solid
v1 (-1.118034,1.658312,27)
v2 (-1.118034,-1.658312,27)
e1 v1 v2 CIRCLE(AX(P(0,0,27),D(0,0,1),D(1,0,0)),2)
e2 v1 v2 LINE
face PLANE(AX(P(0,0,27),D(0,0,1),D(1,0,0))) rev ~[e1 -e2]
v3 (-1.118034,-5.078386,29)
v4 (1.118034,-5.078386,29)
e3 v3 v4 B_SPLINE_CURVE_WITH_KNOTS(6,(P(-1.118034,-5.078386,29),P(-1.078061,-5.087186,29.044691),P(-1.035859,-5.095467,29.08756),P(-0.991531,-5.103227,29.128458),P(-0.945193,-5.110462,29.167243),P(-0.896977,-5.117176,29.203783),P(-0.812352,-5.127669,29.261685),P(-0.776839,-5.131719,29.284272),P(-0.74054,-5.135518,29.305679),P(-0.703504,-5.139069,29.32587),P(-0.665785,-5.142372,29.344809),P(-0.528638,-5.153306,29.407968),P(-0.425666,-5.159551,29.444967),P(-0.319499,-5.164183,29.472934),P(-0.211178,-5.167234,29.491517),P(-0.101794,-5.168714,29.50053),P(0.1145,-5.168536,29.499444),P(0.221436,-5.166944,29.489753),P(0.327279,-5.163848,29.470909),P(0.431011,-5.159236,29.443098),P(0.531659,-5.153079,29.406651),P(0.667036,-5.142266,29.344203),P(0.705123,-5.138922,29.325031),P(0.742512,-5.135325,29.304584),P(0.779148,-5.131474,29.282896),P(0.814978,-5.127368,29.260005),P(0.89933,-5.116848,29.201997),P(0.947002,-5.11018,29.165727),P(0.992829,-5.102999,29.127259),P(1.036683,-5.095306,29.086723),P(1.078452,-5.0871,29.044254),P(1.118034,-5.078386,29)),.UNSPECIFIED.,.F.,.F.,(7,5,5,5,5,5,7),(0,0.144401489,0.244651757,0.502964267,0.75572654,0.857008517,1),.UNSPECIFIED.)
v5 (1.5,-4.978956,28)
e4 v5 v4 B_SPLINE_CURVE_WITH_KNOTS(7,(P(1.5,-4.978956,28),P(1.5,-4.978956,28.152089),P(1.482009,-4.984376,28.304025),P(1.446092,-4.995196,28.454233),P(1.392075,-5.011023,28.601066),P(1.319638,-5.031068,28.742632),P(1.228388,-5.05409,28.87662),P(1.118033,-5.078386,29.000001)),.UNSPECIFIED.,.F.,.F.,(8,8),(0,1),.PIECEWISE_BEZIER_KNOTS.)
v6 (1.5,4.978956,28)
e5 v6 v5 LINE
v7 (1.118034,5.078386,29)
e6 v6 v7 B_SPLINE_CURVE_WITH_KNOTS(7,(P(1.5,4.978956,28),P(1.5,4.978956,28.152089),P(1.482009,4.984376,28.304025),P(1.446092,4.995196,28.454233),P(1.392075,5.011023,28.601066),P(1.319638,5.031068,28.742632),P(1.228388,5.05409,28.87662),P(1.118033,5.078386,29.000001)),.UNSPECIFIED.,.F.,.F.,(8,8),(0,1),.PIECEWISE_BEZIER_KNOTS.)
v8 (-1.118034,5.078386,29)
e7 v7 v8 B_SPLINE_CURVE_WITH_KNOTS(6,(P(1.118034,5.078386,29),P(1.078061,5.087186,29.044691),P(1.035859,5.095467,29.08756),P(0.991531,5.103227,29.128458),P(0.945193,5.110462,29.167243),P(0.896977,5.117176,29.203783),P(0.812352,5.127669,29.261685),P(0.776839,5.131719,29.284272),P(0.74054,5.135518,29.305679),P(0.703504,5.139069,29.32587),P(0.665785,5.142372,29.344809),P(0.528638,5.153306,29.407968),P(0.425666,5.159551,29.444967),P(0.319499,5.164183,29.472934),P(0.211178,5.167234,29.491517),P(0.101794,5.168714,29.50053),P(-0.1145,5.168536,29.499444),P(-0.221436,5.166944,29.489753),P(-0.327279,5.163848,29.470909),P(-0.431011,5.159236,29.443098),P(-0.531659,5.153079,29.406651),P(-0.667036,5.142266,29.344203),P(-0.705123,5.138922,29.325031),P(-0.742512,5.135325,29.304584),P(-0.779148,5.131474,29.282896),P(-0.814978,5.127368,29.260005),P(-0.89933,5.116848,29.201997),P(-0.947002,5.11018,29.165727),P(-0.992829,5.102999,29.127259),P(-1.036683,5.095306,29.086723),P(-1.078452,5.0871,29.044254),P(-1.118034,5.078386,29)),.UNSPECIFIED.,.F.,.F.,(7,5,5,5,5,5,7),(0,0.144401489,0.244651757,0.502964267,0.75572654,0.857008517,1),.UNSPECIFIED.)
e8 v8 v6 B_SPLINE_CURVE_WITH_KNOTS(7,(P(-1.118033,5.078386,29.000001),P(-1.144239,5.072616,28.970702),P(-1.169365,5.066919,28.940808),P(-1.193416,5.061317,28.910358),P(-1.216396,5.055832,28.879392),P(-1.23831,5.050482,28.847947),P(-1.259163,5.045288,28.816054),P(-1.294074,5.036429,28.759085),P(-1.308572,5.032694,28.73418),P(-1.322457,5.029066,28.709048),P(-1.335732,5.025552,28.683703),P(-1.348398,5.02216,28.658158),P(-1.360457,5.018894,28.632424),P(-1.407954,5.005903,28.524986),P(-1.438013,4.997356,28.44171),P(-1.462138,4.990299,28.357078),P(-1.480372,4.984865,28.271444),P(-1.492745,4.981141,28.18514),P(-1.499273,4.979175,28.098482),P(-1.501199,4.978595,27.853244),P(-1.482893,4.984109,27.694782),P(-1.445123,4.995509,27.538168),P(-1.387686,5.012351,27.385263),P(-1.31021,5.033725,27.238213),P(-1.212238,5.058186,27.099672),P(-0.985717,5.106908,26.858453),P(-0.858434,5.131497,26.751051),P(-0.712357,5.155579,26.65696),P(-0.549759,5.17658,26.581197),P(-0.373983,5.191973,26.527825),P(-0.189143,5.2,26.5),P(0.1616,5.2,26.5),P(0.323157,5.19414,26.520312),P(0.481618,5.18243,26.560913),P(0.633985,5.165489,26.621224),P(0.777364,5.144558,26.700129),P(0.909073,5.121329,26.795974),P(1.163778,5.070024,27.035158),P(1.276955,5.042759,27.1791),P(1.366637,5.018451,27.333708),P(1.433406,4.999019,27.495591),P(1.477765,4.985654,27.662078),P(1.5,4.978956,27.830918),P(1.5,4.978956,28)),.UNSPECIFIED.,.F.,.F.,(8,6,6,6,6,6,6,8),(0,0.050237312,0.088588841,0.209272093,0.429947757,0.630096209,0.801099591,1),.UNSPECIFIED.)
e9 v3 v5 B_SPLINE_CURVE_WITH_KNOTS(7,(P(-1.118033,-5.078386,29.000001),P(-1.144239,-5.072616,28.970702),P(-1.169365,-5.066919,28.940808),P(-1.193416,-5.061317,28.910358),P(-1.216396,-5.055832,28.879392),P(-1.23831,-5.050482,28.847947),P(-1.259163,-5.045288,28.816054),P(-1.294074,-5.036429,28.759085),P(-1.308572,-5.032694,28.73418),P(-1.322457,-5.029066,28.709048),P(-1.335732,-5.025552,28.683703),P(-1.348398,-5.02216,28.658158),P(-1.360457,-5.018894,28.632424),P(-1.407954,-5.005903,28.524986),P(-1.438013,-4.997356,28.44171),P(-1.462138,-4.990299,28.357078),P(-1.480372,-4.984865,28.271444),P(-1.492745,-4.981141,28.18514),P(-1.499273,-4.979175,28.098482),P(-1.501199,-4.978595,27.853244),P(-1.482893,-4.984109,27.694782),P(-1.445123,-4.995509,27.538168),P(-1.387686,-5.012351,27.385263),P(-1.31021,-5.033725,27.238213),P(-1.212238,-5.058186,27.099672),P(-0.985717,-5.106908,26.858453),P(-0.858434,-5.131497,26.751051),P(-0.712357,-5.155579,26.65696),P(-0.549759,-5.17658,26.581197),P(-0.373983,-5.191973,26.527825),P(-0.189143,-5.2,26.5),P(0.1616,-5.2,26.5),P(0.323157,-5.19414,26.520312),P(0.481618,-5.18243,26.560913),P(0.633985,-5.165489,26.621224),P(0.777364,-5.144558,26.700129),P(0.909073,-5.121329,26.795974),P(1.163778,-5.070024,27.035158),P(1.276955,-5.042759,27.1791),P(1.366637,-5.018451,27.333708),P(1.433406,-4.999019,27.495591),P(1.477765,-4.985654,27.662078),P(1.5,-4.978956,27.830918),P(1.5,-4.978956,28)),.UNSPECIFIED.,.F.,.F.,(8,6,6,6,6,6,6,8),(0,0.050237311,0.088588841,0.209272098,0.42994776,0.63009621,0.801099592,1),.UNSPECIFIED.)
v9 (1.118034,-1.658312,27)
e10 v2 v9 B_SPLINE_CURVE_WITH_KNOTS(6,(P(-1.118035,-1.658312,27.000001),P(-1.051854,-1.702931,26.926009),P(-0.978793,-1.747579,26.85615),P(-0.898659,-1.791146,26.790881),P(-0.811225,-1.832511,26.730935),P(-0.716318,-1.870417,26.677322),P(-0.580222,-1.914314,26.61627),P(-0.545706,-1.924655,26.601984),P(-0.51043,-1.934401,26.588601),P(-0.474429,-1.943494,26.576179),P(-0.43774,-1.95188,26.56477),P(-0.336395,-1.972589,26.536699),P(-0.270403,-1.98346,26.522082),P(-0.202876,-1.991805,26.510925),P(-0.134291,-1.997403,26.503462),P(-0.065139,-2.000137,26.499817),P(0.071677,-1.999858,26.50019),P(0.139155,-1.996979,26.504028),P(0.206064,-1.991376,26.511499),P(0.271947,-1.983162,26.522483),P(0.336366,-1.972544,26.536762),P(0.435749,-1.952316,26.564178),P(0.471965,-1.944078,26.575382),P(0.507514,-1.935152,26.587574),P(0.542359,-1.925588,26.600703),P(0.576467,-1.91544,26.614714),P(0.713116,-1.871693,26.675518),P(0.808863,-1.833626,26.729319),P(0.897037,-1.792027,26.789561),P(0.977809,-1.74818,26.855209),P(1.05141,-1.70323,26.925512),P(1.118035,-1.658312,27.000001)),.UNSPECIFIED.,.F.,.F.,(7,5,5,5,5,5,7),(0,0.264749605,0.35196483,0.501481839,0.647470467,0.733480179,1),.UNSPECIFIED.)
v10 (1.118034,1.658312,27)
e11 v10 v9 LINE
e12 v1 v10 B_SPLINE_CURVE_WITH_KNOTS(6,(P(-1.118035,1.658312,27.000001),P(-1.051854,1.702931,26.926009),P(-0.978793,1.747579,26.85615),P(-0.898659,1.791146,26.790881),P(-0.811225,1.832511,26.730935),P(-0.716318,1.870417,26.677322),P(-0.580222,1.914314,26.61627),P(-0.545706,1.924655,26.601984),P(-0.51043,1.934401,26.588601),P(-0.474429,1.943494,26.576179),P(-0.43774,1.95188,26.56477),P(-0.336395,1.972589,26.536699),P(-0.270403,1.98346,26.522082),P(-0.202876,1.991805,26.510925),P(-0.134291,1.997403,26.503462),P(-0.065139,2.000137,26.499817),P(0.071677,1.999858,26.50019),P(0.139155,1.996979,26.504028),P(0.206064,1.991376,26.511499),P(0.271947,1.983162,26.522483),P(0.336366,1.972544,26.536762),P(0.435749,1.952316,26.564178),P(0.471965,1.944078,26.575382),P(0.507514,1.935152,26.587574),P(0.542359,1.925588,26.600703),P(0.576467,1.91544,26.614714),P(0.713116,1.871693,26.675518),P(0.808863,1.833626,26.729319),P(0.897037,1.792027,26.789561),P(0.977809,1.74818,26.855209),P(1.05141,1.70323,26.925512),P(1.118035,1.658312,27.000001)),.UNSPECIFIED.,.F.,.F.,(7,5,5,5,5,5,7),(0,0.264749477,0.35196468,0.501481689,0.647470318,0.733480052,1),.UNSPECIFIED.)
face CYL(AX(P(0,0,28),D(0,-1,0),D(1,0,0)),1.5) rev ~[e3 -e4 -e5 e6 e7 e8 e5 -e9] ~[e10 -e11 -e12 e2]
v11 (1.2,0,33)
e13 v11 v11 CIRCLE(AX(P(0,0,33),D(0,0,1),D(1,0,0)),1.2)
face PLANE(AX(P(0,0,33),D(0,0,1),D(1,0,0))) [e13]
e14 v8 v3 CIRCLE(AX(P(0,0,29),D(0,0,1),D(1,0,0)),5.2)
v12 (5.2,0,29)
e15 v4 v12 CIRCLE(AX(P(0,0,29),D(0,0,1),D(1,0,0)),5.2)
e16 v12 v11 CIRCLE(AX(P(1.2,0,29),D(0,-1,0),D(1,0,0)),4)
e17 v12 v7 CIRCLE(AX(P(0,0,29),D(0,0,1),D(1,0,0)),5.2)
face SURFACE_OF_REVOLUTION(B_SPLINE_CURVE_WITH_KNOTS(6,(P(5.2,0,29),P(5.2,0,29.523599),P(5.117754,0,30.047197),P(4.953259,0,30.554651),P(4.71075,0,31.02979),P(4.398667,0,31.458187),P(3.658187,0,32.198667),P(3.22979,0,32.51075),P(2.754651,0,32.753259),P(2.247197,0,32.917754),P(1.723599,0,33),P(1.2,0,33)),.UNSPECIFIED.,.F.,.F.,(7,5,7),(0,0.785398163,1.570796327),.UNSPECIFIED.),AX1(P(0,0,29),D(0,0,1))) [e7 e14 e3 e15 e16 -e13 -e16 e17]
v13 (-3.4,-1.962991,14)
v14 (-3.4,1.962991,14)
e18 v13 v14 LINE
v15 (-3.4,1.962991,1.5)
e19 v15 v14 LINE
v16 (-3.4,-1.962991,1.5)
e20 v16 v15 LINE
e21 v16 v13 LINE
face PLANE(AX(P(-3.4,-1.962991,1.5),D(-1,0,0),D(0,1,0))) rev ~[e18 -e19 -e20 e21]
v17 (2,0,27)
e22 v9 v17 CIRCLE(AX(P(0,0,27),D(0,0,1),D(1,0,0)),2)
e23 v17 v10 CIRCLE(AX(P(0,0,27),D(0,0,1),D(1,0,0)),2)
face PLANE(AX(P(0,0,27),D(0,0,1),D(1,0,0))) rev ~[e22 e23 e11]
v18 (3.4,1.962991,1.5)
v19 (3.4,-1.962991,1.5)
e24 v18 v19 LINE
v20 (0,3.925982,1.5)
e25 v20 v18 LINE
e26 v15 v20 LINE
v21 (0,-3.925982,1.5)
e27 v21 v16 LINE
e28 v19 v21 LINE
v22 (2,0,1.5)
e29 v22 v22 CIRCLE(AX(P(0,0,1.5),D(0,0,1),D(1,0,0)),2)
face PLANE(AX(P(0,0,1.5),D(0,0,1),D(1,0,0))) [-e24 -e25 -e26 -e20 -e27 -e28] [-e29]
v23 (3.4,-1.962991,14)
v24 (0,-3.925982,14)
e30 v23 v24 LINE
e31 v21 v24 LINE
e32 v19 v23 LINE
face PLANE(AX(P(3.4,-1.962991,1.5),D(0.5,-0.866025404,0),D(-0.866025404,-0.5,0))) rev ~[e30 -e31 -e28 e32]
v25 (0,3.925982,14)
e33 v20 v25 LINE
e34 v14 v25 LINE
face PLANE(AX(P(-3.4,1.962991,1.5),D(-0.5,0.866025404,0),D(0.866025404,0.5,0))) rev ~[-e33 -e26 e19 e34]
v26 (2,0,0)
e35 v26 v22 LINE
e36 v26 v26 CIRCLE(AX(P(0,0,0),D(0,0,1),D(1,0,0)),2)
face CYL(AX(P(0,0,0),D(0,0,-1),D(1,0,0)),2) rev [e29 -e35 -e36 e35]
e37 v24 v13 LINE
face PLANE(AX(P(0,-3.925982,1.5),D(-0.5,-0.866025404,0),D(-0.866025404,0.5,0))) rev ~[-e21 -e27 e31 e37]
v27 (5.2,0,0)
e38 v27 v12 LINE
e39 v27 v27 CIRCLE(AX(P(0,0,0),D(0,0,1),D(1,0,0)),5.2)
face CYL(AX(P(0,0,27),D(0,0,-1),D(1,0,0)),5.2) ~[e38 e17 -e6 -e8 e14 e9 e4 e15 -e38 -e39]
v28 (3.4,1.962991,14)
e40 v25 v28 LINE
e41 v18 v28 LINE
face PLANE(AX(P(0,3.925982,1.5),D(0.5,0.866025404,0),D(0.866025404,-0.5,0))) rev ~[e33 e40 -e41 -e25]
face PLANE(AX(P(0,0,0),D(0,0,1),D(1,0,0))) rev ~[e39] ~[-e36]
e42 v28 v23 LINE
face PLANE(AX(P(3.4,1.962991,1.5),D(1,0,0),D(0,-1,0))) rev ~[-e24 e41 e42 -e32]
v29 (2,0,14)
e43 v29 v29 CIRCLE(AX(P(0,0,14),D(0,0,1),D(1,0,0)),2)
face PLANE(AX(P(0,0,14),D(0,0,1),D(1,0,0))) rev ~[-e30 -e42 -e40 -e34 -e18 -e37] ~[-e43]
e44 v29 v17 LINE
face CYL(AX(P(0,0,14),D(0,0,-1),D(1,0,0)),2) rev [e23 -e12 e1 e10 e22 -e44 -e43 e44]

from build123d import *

# Parameters (mm, degrees)
F0_R      = 5.2
F0_R_2    = 2
F1_DEPTH  = 1.5
F2_R      = 5.2
F3_DEPTH  = 12.5
F4_R      = 5.2
F4_R_2    = 2
F5_DEPTH  = 13
F6_R      = 5.2
F7_DEPTH  = 6
F8_R      = 4
F9_R      = 1.5
F10_DEPTH = 12.5


with BuildPart() as f1:
    # F0 (on Top) → F1 (new body)
    with BuildSketch(Plane.XY):
        Circle(F0_R)
        Circle(F0_R_2, mode=Mode.SUBTRACT)
    extrude(amount=F1_DEPTH)

    # F2 (on face) → F3 (join)
    with BuildSketch(Plane.XY.offset(1.5)):
        Circle(F2_R)
        Polygon((0, 3.9259818305), (3.4, 1.9629909152), (3.4, -1.9629909152), (0, -3.9259818305), (-3.4, -1.9629909152), (-3.4, 1.9629909152), align=None, mode=Mode.SUBTRACT)
    extrude(amount=F3_DEPTH)

    # F4 (on face) → F5 (join)
    with BuildSketch(Plane.XY.offset(14)):
        Circle(F4_R)
        Polygon((-3.4, -1.9629909152), (-3.4, 1.9629909152), (0, 3.9259818305), (3.4, 1.9629909152), (3.4, -1.9629909152), (0, -3.9259818305), align=None, mode=Mode.SUBTRACT)
        Polygon((0, 3.9259818305), (-3.4, 1.9629909152), (-3.4, -1.9629909152), (0, -3.9259818305), (3.4, -1.9629909152), (3.4, 1.9629909152), align=None)
        Circle(F4_R_2, mode=Mode.SUBTRACT)
    extrude(amount=F5_DEPTH)

    # F6 (on face) → F7 (join)
    with BuildSketch(Plane.XY.offset(27)):
        Circle(F6_R)
    extrude(amount=F7_DEPTH)

    # F8
    f8_edges = [f1.edges().sort_by_distance(p)[0] for p in [
        (-5.2, 0, 33),
    ]]
    fillet(f8_edges, radius=F8_R)

    # F9 (on Front) → F10 (cut, symmetric)
    with BuildSketch(Plane.XZ):
        with Locations((0, 28)):
            Circle(F9_R)
    extrude(amount=F10_DEPTH, both=True, mode=Mode.SUBTRACT)


solid = f1.part
